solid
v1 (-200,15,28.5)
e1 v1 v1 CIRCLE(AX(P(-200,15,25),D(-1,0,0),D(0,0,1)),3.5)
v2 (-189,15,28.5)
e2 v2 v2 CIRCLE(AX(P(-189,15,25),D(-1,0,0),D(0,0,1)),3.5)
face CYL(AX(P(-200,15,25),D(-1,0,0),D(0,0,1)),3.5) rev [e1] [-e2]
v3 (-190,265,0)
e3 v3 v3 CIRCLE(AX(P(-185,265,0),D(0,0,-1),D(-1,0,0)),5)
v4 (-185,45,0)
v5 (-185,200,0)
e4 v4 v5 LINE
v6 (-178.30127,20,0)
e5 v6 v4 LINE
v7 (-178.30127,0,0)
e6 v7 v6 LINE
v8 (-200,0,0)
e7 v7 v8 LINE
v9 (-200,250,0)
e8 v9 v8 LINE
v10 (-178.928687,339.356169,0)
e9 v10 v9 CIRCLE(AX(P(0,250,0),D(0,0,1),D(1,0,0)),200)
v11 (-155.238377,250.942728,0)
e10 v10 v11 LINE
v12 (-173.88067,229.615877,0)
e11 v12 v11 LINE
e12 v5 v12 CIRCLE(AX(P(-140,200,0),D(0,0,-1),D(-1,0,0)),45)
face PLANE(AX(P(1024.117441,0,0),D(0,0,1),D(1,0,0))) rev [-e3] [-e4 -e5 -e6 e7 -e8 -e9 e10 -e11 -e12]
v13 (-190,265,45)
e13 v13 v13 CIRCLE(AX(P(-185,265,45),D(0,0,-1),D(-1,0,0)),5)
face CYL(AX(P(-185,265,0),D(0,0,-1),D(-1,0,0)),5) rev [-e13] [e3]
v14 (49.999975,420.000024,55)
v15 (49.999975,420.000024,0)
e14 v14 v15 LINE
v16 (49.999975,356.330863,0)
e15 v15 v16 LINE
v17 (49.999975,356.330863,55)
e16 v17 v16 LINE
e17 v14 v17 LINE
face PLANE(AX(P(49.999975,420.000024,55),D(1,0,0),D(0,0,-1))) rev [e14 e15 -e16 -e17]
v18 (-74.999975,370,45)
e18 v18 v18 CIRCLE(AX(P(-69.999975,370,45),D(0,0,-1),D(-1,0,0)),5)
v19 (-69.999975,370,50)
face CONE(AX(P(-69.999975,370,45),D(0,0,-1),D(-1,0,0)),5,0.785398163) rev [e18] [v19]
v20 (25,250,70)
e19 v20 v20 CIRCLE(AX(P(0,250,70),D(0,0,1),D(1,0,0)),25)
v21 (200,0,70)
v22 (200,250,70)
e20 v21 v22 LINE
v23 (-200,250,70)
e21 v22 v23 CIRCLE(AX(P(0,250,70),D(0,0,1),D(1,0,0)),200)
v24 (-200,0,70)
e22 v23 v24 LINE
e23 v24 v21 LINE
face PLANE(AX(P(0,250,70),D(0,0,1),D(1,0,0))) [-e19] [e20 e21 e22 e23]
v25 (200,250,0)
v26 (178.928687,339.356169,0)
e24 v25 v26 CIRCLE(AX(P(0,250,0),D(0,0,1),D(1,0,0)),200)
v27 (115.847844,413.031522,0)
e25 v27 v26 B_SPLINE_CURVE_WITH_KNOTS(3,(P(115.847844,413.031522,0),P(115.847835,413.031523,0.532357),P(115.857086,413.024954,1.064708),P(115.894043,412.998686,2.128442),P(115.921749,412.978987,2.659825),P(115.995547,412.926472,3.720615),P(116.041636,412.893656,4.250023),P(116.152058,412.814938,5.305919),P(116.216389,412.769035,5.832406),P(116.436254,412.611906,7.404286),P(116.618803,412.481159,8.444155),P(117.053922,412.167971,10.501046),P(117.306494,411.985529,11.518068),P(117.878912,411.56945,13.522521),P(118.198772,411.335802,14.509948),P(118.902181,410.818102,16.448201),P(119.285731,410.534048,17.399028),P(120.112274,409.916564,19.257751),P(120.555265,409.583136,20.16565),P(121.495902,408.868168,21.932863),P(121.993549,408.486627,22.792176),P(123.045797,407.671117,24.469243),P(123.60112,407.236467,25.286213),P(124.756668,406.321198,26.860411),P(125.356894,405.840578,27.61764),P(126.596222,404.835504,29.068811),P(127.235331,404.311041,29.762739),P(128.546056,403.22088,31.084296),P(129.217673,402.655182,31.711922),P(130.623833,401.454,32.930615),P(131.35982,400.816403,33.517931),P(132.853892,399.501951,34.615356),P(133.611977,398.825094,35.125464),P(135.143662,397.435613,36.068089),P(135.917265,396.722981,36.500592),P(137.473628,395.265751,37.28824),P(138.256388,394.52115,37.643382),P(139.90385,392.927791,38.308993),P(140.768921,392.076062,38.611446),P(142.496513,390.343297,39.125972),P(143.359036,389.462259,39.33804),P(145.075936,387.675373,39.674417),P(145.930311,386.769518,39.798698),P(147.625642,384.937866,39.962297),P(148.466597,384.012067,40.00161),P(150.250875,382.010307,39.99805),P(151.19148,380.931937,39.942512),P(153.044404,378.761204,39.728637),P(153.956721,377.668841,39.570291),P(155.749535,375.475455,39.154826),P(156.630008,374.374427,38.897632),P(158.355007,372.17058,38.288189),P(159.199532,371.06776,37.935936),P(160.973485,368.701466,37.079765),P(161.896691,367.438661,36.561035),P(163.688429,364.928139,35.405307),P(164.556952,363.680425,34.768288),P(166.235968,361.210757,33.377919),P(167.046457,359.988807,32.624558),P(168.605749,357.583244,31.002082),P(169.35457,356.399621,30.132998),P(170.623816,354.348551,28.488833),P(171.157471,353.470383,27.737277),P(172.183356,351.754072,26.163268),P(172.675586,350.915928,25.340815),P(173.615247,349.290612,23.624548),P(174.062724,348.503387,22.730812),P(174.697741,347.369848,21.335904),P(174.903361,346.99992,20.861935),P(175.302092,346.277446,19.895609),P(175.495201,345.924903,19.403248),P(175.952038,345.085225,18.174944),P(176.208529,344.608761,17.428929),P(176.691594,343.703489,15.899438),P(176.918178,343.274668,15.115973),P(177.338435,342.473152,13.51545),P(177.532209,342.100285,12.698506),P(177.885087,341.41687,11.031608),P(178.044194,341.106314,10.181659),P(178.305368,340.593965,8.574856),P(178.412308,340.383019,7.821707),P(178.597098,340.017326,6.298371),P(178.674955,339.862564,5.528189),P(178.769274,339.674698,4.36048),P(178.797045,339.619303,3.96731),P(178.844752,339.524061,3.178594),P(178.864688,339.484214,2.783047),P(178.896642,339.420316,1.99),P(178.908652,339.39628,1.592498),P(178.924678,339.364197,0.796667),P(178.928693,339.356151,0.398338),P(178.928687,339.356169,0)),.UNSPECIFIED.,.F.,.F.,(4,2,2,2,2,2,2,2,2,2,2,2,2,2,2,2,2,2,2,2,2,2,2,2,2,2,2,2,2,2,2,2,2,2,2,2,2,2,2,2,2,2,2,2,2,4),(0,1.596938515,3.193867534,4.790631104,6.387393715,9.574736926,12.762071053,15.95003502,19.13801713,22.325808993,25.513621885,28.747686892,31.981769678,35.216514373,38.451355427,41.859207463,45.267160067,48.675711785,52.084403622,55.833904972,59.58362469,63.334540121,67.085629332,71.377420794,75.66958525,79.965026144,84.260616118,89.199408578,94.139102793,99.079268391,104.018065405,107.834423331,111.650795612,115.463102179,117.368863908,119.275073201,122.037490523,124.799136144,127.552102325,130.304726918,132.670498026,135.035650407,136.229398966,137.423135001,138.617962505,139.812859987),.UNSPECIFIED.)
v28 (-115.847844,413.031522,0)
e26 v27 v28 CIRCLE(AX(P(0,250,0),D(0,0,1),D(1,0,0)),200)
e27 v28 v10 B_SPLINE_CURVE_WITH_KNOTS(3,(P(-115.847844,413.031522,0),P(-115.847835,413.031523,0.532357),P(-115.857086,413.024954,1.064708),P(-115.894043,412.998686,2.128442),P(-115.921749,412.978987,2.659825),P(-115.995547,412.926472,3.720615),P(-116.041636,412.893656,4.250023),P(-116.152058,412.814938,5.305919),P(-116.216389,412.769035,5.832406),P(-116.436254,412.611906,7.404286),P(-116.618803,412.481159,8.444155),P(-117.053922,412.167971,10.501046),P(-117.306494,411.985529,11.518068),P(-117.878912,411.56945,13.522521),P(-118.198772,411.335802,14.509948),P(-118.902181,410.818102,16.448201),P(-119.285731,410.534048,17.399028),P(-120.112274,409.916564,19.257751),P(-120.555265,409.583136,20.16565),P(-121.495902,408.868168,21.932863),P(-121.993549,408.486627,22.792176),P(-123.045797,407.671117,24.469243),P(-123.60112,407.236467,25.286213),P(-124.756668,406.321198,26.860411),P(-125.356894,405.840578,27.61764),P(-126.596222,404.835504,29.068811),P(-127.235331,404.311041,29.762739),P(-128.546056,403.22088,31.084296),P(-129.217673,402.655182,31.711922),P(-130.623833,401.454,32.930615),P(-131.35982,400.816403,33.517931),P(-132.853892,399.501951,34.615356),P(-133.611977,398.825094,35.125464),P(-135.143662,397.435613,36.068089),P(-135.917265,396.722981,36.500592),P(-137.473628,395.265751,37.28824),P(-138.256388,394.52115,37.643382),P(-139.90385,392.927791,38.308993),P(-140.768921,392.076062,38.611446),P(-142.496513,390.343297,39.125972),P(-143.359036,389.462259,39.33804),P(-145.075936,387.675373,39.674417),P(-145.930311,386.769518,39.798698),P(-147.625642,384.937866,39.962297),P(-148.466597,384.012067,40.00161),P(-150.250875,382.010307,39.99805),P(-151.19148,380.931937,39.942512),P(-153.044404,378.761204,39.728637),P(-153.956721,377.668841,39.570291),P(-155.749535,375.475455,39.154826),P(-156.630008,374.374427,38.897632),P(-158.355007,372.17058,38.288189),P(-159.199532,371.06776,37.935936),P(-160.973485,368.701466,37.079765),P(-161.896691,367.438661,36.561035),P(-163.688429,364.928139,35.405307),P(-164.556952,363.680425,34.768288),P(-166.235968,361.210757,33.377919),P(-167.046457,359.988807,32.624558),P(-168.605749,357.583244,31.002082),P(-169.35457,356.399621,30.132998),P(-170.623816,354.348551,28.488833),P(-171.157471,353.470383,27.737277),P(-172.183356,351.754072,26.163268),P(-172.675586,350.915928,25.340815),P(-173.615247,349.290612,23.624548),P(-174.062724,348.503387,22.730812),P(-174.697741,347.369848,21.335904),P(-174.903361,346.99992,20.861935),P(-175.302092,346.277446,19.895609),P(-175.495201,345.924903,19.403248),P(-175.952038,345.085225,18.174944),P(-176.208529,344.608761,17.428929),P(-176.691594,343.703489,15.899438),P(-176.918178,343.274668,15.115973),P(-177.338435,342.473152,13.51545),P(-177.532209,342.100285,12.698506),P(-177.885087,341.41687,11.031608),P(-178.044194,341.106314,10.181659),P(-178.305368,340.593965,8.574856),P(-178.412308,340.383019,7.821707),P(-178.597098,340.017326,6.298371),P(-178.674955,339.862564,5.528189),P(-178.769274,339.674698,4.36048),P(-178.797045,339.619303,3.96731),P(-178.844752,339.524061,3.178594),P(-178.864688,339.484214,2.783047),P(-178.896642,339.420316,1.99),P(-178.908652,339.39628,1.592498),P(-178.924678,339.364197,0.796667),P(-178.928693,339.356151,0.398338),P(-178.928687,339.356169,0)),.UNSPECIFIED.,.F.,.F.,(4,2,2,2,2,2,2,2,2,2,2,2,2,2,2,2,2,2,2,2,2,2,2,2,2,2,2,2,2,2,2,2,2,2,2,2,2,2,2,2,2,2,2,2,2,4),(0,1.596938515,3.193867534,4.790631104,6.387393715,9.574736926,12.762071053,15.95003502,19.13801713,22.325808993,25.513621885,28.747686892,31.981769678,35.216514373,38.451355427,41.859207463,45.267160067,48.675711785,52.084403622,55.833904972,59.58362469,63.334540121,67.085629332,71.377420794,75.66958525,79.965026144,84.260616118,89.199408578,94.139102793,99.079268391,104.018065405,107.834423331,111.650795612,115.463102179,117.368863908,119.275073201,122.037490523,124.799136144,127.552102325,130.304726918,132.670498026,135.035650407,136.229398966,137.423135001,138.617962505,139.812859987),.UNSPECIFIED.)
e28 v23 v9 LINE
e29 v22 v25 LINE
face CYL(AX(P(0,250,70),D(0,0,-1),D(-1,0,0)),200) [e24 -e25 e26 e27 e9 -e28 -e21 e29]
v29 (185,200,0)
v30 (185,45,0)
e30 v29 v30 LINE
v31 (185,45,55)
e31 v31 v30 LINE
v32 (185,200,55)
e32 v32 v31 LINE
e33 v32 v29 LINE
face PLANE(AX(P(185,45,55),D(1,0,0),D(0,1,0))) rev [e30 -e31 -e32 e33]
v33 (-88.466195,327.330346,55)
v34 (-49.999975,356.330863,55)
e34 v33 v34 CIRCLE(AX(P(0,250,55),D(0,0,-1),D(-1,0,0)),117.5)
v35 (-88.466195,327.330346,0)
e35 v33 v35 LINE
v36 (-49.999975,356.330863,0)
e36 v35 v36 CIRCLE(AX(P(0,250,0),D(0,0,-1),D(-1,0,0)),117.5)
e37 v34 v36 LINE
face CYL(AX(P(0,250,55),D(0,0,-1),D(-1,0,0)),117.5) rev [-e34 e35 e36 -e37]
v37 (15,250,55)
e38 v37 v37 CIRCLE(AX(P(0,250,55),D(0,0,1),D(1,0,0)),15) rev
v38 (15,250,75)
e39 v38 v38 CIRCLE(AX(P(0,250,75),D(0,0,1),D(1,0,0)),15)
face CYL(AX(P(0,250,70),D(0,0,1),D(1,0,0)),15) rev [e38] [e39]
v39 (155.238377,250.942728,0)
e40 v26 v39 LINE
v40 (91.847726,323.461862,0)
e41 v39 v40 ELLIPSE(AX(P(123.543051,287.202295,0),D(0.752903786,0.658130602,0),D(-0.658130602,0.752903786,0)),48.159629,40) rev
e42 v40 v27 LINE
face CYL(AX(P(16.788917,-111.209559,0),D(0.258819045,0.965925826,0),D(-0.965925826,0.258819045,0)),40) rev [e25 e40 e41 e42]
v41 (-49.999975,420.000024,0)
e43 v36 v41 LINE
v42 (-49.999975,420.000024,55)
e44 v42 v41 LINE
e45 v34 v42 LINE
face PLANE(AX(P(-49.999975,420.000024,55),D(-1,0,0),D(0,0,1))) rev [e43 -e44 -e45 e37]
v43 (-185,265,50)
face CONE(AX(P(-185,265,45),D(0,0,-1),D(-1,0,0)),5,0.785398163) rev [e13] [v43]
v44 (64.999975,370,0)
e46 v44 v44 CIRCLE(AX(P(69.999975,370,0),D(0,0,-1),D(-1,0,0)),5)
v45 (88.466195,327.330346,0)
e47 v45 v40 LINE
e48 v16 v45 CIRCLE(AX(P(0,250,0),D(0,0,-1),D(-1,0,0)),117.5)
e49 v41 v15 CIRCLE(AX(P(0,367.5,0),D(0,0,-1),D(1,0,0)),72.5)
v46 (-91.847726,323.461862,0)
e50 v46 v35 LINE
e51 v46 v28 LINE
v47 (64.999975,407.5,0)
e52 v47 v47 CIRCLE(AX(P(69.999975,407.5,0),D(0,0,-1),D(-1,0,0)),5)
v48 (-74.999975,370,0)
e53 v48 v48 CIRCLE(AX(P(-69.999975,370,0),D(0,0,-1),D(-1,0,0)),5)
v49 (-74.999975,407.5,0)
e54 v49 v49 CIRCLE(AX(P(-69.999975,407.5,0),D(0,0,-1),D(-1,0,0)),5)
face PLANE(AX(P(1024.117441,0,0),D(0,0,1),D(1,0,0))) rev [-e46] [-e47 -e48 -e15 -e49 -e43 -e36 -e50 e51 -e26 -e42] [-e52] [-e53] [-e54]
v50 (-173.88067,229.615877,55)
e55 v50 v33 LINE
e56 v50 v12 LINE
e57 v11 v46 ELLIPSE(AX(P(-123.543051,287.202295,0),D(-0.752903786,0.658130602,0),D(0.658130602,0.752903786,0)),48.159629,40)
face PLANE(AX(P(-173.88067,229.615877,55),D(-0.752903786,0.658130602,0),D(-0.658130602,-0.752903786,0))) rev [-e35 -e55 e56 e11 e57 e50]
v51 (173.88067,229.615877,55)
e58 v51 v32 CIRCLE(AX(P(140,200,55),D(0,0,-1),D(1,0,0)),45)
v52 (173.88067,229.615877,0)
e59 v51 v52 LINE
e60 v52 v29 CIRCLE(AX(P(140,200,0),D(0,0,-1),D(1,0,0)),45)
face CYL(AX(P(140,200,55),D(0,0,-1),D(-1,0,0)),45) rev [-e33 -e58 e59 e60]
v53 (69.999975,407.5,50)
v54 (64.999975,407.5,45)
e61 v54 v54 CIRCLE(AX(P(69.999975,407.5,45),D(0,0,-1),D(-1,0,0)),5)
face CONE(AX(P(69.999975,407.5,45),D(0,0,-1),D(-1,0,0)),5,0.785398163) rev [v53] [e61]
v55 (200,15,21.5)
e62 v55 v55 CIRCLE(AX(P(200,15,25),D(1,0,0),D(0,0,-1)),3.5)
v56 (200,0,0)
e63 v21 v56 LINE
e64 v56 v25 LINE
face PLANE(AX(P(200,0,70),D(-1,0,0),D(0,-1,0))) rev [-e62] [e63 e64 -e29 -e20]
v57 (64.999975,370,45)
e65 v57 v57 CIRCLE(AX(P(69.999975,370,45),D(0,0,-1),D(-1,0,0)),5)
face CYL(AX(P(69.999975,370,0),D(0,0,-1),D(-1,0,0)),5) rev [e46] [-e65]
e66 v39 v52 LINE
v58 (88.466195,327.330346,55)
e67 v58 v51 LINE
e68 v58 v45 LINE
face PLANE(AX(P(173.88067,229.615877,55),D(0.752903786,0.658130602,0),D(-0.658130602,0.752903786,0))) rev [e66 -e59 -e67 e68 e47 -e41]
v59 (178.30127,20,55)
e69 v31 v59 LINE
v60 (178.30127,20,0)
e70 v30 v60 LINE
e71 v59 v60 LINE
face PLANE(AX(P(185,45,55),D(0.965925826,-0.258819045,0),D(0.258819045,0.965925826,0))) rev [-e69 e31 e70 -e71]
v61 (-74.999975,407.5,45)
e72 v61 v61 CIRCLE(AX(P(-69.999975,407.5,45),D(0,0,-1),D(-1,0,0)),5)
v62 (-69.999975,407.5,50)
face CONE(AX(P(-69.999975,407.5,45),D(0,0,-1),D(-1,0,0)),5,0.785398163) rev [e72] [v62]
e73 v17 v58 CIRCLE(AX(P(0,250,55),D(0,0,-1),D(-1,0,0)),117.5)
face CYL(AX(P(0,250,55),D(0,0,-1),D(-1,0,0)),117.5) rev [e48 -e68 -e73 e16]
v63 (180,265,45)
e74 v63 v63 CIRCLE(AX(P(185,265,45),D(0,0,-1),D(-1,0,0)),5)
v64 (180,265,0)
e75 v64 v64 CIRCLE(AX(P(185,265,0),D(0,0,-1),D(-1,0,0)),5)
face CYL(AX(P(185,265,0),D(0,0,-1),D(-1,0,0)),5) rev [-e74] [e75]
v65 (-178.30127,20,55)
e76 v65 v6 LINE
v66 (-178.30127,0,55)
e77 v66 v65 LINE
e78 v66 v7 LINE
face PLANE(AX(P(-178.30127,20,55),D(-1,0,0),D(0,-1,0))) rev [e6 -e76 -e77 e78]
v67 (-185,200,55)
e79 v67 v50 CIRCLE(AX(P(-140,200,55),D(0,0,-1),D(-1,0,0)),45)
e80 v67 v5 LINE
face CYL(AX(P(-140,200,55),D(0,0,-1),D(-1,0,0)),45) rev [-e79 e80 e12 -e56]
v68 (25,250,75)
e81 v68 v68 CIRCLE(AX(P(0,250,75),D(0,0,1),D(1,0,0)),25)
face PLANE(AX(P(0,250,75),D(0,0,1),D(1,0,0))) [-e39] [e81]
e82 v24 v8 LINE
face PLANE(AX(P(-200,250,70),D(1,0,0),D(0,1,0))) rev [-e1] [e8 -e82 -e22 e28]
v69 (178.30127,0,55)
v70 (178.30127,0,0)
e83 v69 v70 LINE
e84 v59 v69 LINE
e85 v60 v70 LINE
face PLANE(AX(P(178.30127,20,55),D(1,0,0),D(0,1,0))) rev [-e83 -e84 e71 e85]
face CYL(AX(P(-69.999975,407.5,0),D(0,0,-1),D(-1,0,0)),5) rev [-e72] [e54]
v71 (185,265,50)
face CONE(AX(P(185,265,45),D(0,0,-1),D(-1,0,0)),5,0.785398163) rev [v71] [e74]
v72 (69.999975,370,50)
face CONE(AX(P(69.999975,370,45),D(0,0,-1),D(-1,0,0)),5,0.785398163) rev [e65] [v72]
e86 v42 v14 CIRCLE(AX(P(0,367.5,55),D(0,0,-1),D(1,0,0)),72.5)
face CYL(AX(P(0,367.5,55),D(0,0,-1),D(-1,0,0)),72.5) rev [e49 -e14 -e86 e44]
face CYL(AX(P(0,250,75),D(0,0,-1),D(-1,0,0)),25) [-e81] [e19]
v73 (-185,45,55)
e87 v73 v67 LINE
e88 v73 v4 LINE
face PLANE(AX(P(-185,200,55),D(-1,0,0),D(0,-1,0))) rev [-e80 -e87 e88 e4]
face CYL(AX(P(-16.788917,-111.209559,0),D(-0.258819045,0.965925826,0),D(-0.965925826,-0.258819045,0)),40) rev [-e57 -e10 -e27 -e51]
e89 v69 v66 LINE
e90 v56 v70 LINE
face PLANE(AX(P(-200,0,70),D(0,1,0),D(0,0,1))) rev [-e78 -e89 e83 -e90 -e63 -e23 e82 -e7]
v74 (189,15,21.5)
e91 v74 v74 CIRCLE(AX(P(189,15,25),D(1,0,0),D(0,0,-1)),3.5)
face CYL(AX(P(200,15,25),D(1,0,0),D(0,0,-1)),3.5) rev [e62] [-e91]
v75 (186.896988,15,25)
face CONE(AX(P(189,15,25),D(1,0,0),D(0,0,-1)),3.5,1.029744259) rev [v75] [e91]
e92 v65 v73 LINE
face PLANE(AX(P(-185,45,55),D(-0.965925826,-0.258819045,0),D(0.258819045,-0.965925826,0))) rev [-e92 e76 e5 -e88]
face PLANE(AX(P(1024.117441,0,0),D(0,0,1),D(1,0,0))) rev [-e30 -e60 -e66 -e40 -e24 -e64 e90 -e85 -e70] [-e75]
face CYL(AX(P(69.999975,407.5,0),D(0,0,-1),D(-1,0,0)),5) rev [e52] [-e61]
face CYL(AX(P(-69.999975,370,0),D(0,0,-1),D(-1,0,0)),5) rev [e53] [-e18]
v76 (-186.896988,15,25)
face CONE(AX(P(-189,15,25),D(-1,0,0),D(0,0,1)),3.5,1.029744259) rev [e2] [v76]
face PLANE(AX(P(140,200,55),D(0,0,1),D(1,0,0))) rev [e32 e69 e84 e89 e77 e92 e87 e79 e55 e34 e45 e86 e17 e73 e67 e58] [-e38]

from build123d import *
from build123d.topology import SkipClean

# Parameters (mm, degrees)
BOSS_EXTRUDE4_DEPTH             = 70
F_1_0MM_DOWEL_HOLE1_D           = 30
SKETCH4_R                       = 25
SKETCH4_R_2                     = 15
BOSS_EXTRUDE5_DEPTH             = 5
CUT_EXTRUDE4_DEPTH              = 499.121471129
CUT_EXTRUDE4_DEPTH_BACK         = 499.121471129
CUT_EXTRUDE5_DEPTH              = 55
F_10_0MM_DOWEL_HOLE1_AT_2_COUNT = 2
F_10_0MM_DOWEL_HOLE1_AT_2_PITCH = 155.724133524
F_10_0MM_DOWEL_HOLE1_AT_3_COUNT = 2
F_10_0MM_DOWEL_HOLE1_AT_3_PITCH = 183.115416505
CUT_EXTRUDE6_REACH              = 547.552
SKETCH22_R                      = 40


with BuildPart() as part:
    # Sketch2 → Boss-Extrude4 (new, symmetric)
    with BuildSketch(Plane.XY):
        with BuildLine():
            Line((-200, 0), (200, 0))
            Line((200, 0), (200, 250))
            ThreePointArc((200, 250), (0, 450), (-200, 250))
            Line((-200, 250), (-200, 0))
        make_face()
    extrude(amount=BOSS_EXTRUDE4_DEPTH, both=True)

    # Ø1.0mm Dowel Hole1 (through all)
    with Locations(Plane(origin=(0, 250, 70), x_dir=(1, 0, 0), z_dir=(0, 0, 1))):
        with Locations((0, 0)):
            Hole(F_1_0MM_DOWEL_HOLE1_D / 2)

    # Sketch4 → Boss-Extrude5 (add)
    with SkipClean():  # the faces are left unmerged after this step: merging them gives an invalid solid
        with BuildSketch(Plane.XY.offset(70)):
            with Locations((0, 250)):
                Circle(SKETCH4_R)
            with Locations((0, 250)):
                Circle(SKETCH4_R_2, mode=Mode.SUBTRACT)
        extrude(amount=BOSS_EXTRUDE5_DEPTH)
    add(part.part.scale(1), mode=Mode.REPLACE)  # the faces are merged on a copy

    # Sketch13 → Cut-Extrude4 (cut, two sides: drawn at the far end of the back side and taken through both)
    with BuildSketch(Plane(origin=(0, 0, 0), x_dir=(0, 0, -1), z_dir=(1, 0, 0)).offset(-CUT_EXTRUDE4_DEPTH_BACK)):
        Polygon((0, -922.414379545), (0, 0), (0, 450), (0, 1372.414379545), (1844.828759089, 1372.414379545), (1844.828759089, -922.414379545), align=None)
    extrude(amount=CUT_EXTRUDE4_DEPTH + CUT_EXTRUDE4_DEPTH_BACK, mode=Mode.SUBTRACT)

    # Sketch14 → Cut-Extrude5 (cut)
    with BuildSketch(Plane(origin=(0, 0, 0), x_dir=(-1, 0, 0), z_dir=(0, 0, -1))):
        with BuildLine():
            Line((-185, 45), (-185, 200))
            ThreePointArc((-185, 200), (-182.128554255, 215.817234791), (-173.880670381, 229.615877068))
            Line((-173.880670381, 229.615877068), (-88.466194885, 327.330345677))
            ThreePointArc((-88.466194885, 327.330345677), (-70.735263863, 343.823091221), (-49.999974949, 356.330863371))
            Line((-49.999974949, 356.330863371), (-49.999974949, 420.000023858))
            ThreePointArc((-49.999974949, 420.000023858), (0, 440), (49.999974949, 420.000023858))
            Line((49.999974949, 420.000023858), (49.999974949, 356.330863371))
            ThreePointArc((49.999974949, 356.330863371), (70.735263863, 343.823091221), (88.466194885, 327.330345677))
            Line((88.466194885, 327.330345677), (173.880670381, 229.615877068))
            ThreePointArc((173.880670381, 229.615877068), (182.128554255, 215.817234791), (185, 200))
            Line((185, 200), (185, 45))
            Line((185, 45), (178.301270189, 20))
            Line((178.301270189, 20), (178.301270189, 0))
            Line((178.301270189, 0), (-178.301270189, 0))
            Line((-178.301270189, 0), (-178.301270189, 20))
            Line((-178.301270189, 20), (-185, 45))
        make_face()
    extrude(amount=-CUT_EXTRUDE5_DEPTH, mode=Mode.SUBTRACT)

    # Sketch18 → M8x1.0 Tapped Hole1 (revolve, cut)
    with BuildSketch(Plane(origin=(-200, 15, 25), x_dir=(0, 0, 1), z_dir=(0, 1, 0))):
        Polygon((0, 0), (0, 13.103012167), (3.5, 11), (3.5, 0), align=None)
    m8x1_0_tapped_hole1 = revolve(axis=Axis((-206.35, 15, 25), (1, 0, 0)), mode=Mode.SUBTRACT)

    # Mirror2: M8x1.0 Tapped Hole1 across plane
    add(m8x1_0_tapped_hole1.mirror(Plane(origin=(0, 0, 0), x_dir=(0, 0, 1), z_dir=(1, 0, 0))), mode=Mode.SUBTRACT)

    # Sketch21 → Ø10.0mm Dowel Hole1 (revolve, cut)
    with BuildSketch(Plane(origin=(185, 265, 0), x_dir=(0, 1, 0), z_dir=(1, 0, 0))):
        Polygon((0, 0), (0, 50), (5, 45), (5, 0), align=None)
    f_10_0mm_dowel_hole1 = revolve(axis=Axis((185, 265, -6.35), (0, 0, 1)), mode=Mode.SUBTRACT)

    # Ø10.0mm Dowel Hole1 at 2: Ø10.0mm Dowel Hole1 ×2
    with Locations(*[Vector(-0.7384855670659363, 0.6742692839180076, 0) * (i * F_10_0MM_DOWEL_HOLE1_AT_2_PITCH) for i in range(1, F_10_0MM_DOWEL_HOLE1_AT_2_COUNT)]):
        add(f_10_0mm_dowel_hole1, mode=Mode.SUBTRACT)

    # Ø10.0mm Dowel Hole1 at 3: Ø10.0mm Dowel Hole1 ×2
    with Locations(*[Vector(-0.6280193511079233, 0.7781977220693871, 0) * (i * F_10_0MM_DOWEL_HOLE1_AT_3_PITCH) for i in range(1, F_10_0MM_DOWEL_HOLE1_AT_3_COUNT)]):
        add(f_10_0mm_dowel_hole1, mode=Mode.SUBTRACT)

    # Mirror3: Ø10.0mm Dowel Hole1 across plane
    add(f_10_0mm_dowel_hole1.mirror(Plane(origin=(0, 0, 0), x_dir=(0, 0, 1), z_dir=(1, 0, 0))), mode=Mode.SUBTRACT)

    # Mirror3 copy 1 sketch → Mirror3 copy 1 (revolve, cut)
    with BuildSketch(Plane(origin=(-69.999974949, 370, 0), x_dir=(0, 1, 0), z_dir=(-1, 0, 0))):
        Polygon((0, 0), (0, -50), (5, -45), (5, 0), align=None)
    revolve(axis=Axis((-69.999974949, 370, -6.35), (0, 0, -1)), mode=Mode.SUBTRACT)

    # Mirror3 copy 2 sketch → Mirror3 copy 2 (revolve, cut)
    with BuildSketch(Plane(origin=(-69.999974949, 407.5, 0), x_dir=(0, 1, 0), z_dir=(-1, 0, 0))):
        Polygon((0, 0), (0, -50), (5, -45), (5, 0), align=None)
    revolve(axis=Axis((-69.999974949, 407.5, -6.35), (0, 0, -1)), mode=Mode.SUBTRACT)

    # Cut-Extrude6: up to this plane
    cut_extrude6_end = Plane(origin=(-200, 0, 70), z_dir=(0, 1, 0))
    # Sketch22 → Cut-Extrude6 (cut, up to the surface)
    with BuildSketch(Plane(origin=(-114.263809021, 426.438340731, 0), x_dir=(0, 0, -1), z_dir=(-0.25881904510252135, 0.9659258262890681, 0)), mode=Mode.PRIVATE) as cut_extrude6_sk1:
        with Locations((0, 45)):
            Circle(SKETCH22_R)
    cut_extrude6_tool1 = split(extrude(cut_extrude6_sk1.sketch, amount=-CUT_EXTRUDE6_REACH, mode=Mode.PRIVATE), bisect_by=cut_extrude6_end, keep=Keep.BOTH, mode=Mode.PRIVATE)
    cut_extrude6 = cut_extrude6_tool1.solids().sort_by_distance((-157.730471, 414.791484, 0))[0]
    add(cut_extrude6, mode=Mode.SUBTRACT)

    # Mirror4: Cut-Extrude6 across plane
    add(cut_extrude6.mirror(Plane(origin=(0, 0, 0), x_dir=(0, 0, 1), z_dir=(1, 0, 0))), mode=Mode.SUBTRACT)


solid = part.part
